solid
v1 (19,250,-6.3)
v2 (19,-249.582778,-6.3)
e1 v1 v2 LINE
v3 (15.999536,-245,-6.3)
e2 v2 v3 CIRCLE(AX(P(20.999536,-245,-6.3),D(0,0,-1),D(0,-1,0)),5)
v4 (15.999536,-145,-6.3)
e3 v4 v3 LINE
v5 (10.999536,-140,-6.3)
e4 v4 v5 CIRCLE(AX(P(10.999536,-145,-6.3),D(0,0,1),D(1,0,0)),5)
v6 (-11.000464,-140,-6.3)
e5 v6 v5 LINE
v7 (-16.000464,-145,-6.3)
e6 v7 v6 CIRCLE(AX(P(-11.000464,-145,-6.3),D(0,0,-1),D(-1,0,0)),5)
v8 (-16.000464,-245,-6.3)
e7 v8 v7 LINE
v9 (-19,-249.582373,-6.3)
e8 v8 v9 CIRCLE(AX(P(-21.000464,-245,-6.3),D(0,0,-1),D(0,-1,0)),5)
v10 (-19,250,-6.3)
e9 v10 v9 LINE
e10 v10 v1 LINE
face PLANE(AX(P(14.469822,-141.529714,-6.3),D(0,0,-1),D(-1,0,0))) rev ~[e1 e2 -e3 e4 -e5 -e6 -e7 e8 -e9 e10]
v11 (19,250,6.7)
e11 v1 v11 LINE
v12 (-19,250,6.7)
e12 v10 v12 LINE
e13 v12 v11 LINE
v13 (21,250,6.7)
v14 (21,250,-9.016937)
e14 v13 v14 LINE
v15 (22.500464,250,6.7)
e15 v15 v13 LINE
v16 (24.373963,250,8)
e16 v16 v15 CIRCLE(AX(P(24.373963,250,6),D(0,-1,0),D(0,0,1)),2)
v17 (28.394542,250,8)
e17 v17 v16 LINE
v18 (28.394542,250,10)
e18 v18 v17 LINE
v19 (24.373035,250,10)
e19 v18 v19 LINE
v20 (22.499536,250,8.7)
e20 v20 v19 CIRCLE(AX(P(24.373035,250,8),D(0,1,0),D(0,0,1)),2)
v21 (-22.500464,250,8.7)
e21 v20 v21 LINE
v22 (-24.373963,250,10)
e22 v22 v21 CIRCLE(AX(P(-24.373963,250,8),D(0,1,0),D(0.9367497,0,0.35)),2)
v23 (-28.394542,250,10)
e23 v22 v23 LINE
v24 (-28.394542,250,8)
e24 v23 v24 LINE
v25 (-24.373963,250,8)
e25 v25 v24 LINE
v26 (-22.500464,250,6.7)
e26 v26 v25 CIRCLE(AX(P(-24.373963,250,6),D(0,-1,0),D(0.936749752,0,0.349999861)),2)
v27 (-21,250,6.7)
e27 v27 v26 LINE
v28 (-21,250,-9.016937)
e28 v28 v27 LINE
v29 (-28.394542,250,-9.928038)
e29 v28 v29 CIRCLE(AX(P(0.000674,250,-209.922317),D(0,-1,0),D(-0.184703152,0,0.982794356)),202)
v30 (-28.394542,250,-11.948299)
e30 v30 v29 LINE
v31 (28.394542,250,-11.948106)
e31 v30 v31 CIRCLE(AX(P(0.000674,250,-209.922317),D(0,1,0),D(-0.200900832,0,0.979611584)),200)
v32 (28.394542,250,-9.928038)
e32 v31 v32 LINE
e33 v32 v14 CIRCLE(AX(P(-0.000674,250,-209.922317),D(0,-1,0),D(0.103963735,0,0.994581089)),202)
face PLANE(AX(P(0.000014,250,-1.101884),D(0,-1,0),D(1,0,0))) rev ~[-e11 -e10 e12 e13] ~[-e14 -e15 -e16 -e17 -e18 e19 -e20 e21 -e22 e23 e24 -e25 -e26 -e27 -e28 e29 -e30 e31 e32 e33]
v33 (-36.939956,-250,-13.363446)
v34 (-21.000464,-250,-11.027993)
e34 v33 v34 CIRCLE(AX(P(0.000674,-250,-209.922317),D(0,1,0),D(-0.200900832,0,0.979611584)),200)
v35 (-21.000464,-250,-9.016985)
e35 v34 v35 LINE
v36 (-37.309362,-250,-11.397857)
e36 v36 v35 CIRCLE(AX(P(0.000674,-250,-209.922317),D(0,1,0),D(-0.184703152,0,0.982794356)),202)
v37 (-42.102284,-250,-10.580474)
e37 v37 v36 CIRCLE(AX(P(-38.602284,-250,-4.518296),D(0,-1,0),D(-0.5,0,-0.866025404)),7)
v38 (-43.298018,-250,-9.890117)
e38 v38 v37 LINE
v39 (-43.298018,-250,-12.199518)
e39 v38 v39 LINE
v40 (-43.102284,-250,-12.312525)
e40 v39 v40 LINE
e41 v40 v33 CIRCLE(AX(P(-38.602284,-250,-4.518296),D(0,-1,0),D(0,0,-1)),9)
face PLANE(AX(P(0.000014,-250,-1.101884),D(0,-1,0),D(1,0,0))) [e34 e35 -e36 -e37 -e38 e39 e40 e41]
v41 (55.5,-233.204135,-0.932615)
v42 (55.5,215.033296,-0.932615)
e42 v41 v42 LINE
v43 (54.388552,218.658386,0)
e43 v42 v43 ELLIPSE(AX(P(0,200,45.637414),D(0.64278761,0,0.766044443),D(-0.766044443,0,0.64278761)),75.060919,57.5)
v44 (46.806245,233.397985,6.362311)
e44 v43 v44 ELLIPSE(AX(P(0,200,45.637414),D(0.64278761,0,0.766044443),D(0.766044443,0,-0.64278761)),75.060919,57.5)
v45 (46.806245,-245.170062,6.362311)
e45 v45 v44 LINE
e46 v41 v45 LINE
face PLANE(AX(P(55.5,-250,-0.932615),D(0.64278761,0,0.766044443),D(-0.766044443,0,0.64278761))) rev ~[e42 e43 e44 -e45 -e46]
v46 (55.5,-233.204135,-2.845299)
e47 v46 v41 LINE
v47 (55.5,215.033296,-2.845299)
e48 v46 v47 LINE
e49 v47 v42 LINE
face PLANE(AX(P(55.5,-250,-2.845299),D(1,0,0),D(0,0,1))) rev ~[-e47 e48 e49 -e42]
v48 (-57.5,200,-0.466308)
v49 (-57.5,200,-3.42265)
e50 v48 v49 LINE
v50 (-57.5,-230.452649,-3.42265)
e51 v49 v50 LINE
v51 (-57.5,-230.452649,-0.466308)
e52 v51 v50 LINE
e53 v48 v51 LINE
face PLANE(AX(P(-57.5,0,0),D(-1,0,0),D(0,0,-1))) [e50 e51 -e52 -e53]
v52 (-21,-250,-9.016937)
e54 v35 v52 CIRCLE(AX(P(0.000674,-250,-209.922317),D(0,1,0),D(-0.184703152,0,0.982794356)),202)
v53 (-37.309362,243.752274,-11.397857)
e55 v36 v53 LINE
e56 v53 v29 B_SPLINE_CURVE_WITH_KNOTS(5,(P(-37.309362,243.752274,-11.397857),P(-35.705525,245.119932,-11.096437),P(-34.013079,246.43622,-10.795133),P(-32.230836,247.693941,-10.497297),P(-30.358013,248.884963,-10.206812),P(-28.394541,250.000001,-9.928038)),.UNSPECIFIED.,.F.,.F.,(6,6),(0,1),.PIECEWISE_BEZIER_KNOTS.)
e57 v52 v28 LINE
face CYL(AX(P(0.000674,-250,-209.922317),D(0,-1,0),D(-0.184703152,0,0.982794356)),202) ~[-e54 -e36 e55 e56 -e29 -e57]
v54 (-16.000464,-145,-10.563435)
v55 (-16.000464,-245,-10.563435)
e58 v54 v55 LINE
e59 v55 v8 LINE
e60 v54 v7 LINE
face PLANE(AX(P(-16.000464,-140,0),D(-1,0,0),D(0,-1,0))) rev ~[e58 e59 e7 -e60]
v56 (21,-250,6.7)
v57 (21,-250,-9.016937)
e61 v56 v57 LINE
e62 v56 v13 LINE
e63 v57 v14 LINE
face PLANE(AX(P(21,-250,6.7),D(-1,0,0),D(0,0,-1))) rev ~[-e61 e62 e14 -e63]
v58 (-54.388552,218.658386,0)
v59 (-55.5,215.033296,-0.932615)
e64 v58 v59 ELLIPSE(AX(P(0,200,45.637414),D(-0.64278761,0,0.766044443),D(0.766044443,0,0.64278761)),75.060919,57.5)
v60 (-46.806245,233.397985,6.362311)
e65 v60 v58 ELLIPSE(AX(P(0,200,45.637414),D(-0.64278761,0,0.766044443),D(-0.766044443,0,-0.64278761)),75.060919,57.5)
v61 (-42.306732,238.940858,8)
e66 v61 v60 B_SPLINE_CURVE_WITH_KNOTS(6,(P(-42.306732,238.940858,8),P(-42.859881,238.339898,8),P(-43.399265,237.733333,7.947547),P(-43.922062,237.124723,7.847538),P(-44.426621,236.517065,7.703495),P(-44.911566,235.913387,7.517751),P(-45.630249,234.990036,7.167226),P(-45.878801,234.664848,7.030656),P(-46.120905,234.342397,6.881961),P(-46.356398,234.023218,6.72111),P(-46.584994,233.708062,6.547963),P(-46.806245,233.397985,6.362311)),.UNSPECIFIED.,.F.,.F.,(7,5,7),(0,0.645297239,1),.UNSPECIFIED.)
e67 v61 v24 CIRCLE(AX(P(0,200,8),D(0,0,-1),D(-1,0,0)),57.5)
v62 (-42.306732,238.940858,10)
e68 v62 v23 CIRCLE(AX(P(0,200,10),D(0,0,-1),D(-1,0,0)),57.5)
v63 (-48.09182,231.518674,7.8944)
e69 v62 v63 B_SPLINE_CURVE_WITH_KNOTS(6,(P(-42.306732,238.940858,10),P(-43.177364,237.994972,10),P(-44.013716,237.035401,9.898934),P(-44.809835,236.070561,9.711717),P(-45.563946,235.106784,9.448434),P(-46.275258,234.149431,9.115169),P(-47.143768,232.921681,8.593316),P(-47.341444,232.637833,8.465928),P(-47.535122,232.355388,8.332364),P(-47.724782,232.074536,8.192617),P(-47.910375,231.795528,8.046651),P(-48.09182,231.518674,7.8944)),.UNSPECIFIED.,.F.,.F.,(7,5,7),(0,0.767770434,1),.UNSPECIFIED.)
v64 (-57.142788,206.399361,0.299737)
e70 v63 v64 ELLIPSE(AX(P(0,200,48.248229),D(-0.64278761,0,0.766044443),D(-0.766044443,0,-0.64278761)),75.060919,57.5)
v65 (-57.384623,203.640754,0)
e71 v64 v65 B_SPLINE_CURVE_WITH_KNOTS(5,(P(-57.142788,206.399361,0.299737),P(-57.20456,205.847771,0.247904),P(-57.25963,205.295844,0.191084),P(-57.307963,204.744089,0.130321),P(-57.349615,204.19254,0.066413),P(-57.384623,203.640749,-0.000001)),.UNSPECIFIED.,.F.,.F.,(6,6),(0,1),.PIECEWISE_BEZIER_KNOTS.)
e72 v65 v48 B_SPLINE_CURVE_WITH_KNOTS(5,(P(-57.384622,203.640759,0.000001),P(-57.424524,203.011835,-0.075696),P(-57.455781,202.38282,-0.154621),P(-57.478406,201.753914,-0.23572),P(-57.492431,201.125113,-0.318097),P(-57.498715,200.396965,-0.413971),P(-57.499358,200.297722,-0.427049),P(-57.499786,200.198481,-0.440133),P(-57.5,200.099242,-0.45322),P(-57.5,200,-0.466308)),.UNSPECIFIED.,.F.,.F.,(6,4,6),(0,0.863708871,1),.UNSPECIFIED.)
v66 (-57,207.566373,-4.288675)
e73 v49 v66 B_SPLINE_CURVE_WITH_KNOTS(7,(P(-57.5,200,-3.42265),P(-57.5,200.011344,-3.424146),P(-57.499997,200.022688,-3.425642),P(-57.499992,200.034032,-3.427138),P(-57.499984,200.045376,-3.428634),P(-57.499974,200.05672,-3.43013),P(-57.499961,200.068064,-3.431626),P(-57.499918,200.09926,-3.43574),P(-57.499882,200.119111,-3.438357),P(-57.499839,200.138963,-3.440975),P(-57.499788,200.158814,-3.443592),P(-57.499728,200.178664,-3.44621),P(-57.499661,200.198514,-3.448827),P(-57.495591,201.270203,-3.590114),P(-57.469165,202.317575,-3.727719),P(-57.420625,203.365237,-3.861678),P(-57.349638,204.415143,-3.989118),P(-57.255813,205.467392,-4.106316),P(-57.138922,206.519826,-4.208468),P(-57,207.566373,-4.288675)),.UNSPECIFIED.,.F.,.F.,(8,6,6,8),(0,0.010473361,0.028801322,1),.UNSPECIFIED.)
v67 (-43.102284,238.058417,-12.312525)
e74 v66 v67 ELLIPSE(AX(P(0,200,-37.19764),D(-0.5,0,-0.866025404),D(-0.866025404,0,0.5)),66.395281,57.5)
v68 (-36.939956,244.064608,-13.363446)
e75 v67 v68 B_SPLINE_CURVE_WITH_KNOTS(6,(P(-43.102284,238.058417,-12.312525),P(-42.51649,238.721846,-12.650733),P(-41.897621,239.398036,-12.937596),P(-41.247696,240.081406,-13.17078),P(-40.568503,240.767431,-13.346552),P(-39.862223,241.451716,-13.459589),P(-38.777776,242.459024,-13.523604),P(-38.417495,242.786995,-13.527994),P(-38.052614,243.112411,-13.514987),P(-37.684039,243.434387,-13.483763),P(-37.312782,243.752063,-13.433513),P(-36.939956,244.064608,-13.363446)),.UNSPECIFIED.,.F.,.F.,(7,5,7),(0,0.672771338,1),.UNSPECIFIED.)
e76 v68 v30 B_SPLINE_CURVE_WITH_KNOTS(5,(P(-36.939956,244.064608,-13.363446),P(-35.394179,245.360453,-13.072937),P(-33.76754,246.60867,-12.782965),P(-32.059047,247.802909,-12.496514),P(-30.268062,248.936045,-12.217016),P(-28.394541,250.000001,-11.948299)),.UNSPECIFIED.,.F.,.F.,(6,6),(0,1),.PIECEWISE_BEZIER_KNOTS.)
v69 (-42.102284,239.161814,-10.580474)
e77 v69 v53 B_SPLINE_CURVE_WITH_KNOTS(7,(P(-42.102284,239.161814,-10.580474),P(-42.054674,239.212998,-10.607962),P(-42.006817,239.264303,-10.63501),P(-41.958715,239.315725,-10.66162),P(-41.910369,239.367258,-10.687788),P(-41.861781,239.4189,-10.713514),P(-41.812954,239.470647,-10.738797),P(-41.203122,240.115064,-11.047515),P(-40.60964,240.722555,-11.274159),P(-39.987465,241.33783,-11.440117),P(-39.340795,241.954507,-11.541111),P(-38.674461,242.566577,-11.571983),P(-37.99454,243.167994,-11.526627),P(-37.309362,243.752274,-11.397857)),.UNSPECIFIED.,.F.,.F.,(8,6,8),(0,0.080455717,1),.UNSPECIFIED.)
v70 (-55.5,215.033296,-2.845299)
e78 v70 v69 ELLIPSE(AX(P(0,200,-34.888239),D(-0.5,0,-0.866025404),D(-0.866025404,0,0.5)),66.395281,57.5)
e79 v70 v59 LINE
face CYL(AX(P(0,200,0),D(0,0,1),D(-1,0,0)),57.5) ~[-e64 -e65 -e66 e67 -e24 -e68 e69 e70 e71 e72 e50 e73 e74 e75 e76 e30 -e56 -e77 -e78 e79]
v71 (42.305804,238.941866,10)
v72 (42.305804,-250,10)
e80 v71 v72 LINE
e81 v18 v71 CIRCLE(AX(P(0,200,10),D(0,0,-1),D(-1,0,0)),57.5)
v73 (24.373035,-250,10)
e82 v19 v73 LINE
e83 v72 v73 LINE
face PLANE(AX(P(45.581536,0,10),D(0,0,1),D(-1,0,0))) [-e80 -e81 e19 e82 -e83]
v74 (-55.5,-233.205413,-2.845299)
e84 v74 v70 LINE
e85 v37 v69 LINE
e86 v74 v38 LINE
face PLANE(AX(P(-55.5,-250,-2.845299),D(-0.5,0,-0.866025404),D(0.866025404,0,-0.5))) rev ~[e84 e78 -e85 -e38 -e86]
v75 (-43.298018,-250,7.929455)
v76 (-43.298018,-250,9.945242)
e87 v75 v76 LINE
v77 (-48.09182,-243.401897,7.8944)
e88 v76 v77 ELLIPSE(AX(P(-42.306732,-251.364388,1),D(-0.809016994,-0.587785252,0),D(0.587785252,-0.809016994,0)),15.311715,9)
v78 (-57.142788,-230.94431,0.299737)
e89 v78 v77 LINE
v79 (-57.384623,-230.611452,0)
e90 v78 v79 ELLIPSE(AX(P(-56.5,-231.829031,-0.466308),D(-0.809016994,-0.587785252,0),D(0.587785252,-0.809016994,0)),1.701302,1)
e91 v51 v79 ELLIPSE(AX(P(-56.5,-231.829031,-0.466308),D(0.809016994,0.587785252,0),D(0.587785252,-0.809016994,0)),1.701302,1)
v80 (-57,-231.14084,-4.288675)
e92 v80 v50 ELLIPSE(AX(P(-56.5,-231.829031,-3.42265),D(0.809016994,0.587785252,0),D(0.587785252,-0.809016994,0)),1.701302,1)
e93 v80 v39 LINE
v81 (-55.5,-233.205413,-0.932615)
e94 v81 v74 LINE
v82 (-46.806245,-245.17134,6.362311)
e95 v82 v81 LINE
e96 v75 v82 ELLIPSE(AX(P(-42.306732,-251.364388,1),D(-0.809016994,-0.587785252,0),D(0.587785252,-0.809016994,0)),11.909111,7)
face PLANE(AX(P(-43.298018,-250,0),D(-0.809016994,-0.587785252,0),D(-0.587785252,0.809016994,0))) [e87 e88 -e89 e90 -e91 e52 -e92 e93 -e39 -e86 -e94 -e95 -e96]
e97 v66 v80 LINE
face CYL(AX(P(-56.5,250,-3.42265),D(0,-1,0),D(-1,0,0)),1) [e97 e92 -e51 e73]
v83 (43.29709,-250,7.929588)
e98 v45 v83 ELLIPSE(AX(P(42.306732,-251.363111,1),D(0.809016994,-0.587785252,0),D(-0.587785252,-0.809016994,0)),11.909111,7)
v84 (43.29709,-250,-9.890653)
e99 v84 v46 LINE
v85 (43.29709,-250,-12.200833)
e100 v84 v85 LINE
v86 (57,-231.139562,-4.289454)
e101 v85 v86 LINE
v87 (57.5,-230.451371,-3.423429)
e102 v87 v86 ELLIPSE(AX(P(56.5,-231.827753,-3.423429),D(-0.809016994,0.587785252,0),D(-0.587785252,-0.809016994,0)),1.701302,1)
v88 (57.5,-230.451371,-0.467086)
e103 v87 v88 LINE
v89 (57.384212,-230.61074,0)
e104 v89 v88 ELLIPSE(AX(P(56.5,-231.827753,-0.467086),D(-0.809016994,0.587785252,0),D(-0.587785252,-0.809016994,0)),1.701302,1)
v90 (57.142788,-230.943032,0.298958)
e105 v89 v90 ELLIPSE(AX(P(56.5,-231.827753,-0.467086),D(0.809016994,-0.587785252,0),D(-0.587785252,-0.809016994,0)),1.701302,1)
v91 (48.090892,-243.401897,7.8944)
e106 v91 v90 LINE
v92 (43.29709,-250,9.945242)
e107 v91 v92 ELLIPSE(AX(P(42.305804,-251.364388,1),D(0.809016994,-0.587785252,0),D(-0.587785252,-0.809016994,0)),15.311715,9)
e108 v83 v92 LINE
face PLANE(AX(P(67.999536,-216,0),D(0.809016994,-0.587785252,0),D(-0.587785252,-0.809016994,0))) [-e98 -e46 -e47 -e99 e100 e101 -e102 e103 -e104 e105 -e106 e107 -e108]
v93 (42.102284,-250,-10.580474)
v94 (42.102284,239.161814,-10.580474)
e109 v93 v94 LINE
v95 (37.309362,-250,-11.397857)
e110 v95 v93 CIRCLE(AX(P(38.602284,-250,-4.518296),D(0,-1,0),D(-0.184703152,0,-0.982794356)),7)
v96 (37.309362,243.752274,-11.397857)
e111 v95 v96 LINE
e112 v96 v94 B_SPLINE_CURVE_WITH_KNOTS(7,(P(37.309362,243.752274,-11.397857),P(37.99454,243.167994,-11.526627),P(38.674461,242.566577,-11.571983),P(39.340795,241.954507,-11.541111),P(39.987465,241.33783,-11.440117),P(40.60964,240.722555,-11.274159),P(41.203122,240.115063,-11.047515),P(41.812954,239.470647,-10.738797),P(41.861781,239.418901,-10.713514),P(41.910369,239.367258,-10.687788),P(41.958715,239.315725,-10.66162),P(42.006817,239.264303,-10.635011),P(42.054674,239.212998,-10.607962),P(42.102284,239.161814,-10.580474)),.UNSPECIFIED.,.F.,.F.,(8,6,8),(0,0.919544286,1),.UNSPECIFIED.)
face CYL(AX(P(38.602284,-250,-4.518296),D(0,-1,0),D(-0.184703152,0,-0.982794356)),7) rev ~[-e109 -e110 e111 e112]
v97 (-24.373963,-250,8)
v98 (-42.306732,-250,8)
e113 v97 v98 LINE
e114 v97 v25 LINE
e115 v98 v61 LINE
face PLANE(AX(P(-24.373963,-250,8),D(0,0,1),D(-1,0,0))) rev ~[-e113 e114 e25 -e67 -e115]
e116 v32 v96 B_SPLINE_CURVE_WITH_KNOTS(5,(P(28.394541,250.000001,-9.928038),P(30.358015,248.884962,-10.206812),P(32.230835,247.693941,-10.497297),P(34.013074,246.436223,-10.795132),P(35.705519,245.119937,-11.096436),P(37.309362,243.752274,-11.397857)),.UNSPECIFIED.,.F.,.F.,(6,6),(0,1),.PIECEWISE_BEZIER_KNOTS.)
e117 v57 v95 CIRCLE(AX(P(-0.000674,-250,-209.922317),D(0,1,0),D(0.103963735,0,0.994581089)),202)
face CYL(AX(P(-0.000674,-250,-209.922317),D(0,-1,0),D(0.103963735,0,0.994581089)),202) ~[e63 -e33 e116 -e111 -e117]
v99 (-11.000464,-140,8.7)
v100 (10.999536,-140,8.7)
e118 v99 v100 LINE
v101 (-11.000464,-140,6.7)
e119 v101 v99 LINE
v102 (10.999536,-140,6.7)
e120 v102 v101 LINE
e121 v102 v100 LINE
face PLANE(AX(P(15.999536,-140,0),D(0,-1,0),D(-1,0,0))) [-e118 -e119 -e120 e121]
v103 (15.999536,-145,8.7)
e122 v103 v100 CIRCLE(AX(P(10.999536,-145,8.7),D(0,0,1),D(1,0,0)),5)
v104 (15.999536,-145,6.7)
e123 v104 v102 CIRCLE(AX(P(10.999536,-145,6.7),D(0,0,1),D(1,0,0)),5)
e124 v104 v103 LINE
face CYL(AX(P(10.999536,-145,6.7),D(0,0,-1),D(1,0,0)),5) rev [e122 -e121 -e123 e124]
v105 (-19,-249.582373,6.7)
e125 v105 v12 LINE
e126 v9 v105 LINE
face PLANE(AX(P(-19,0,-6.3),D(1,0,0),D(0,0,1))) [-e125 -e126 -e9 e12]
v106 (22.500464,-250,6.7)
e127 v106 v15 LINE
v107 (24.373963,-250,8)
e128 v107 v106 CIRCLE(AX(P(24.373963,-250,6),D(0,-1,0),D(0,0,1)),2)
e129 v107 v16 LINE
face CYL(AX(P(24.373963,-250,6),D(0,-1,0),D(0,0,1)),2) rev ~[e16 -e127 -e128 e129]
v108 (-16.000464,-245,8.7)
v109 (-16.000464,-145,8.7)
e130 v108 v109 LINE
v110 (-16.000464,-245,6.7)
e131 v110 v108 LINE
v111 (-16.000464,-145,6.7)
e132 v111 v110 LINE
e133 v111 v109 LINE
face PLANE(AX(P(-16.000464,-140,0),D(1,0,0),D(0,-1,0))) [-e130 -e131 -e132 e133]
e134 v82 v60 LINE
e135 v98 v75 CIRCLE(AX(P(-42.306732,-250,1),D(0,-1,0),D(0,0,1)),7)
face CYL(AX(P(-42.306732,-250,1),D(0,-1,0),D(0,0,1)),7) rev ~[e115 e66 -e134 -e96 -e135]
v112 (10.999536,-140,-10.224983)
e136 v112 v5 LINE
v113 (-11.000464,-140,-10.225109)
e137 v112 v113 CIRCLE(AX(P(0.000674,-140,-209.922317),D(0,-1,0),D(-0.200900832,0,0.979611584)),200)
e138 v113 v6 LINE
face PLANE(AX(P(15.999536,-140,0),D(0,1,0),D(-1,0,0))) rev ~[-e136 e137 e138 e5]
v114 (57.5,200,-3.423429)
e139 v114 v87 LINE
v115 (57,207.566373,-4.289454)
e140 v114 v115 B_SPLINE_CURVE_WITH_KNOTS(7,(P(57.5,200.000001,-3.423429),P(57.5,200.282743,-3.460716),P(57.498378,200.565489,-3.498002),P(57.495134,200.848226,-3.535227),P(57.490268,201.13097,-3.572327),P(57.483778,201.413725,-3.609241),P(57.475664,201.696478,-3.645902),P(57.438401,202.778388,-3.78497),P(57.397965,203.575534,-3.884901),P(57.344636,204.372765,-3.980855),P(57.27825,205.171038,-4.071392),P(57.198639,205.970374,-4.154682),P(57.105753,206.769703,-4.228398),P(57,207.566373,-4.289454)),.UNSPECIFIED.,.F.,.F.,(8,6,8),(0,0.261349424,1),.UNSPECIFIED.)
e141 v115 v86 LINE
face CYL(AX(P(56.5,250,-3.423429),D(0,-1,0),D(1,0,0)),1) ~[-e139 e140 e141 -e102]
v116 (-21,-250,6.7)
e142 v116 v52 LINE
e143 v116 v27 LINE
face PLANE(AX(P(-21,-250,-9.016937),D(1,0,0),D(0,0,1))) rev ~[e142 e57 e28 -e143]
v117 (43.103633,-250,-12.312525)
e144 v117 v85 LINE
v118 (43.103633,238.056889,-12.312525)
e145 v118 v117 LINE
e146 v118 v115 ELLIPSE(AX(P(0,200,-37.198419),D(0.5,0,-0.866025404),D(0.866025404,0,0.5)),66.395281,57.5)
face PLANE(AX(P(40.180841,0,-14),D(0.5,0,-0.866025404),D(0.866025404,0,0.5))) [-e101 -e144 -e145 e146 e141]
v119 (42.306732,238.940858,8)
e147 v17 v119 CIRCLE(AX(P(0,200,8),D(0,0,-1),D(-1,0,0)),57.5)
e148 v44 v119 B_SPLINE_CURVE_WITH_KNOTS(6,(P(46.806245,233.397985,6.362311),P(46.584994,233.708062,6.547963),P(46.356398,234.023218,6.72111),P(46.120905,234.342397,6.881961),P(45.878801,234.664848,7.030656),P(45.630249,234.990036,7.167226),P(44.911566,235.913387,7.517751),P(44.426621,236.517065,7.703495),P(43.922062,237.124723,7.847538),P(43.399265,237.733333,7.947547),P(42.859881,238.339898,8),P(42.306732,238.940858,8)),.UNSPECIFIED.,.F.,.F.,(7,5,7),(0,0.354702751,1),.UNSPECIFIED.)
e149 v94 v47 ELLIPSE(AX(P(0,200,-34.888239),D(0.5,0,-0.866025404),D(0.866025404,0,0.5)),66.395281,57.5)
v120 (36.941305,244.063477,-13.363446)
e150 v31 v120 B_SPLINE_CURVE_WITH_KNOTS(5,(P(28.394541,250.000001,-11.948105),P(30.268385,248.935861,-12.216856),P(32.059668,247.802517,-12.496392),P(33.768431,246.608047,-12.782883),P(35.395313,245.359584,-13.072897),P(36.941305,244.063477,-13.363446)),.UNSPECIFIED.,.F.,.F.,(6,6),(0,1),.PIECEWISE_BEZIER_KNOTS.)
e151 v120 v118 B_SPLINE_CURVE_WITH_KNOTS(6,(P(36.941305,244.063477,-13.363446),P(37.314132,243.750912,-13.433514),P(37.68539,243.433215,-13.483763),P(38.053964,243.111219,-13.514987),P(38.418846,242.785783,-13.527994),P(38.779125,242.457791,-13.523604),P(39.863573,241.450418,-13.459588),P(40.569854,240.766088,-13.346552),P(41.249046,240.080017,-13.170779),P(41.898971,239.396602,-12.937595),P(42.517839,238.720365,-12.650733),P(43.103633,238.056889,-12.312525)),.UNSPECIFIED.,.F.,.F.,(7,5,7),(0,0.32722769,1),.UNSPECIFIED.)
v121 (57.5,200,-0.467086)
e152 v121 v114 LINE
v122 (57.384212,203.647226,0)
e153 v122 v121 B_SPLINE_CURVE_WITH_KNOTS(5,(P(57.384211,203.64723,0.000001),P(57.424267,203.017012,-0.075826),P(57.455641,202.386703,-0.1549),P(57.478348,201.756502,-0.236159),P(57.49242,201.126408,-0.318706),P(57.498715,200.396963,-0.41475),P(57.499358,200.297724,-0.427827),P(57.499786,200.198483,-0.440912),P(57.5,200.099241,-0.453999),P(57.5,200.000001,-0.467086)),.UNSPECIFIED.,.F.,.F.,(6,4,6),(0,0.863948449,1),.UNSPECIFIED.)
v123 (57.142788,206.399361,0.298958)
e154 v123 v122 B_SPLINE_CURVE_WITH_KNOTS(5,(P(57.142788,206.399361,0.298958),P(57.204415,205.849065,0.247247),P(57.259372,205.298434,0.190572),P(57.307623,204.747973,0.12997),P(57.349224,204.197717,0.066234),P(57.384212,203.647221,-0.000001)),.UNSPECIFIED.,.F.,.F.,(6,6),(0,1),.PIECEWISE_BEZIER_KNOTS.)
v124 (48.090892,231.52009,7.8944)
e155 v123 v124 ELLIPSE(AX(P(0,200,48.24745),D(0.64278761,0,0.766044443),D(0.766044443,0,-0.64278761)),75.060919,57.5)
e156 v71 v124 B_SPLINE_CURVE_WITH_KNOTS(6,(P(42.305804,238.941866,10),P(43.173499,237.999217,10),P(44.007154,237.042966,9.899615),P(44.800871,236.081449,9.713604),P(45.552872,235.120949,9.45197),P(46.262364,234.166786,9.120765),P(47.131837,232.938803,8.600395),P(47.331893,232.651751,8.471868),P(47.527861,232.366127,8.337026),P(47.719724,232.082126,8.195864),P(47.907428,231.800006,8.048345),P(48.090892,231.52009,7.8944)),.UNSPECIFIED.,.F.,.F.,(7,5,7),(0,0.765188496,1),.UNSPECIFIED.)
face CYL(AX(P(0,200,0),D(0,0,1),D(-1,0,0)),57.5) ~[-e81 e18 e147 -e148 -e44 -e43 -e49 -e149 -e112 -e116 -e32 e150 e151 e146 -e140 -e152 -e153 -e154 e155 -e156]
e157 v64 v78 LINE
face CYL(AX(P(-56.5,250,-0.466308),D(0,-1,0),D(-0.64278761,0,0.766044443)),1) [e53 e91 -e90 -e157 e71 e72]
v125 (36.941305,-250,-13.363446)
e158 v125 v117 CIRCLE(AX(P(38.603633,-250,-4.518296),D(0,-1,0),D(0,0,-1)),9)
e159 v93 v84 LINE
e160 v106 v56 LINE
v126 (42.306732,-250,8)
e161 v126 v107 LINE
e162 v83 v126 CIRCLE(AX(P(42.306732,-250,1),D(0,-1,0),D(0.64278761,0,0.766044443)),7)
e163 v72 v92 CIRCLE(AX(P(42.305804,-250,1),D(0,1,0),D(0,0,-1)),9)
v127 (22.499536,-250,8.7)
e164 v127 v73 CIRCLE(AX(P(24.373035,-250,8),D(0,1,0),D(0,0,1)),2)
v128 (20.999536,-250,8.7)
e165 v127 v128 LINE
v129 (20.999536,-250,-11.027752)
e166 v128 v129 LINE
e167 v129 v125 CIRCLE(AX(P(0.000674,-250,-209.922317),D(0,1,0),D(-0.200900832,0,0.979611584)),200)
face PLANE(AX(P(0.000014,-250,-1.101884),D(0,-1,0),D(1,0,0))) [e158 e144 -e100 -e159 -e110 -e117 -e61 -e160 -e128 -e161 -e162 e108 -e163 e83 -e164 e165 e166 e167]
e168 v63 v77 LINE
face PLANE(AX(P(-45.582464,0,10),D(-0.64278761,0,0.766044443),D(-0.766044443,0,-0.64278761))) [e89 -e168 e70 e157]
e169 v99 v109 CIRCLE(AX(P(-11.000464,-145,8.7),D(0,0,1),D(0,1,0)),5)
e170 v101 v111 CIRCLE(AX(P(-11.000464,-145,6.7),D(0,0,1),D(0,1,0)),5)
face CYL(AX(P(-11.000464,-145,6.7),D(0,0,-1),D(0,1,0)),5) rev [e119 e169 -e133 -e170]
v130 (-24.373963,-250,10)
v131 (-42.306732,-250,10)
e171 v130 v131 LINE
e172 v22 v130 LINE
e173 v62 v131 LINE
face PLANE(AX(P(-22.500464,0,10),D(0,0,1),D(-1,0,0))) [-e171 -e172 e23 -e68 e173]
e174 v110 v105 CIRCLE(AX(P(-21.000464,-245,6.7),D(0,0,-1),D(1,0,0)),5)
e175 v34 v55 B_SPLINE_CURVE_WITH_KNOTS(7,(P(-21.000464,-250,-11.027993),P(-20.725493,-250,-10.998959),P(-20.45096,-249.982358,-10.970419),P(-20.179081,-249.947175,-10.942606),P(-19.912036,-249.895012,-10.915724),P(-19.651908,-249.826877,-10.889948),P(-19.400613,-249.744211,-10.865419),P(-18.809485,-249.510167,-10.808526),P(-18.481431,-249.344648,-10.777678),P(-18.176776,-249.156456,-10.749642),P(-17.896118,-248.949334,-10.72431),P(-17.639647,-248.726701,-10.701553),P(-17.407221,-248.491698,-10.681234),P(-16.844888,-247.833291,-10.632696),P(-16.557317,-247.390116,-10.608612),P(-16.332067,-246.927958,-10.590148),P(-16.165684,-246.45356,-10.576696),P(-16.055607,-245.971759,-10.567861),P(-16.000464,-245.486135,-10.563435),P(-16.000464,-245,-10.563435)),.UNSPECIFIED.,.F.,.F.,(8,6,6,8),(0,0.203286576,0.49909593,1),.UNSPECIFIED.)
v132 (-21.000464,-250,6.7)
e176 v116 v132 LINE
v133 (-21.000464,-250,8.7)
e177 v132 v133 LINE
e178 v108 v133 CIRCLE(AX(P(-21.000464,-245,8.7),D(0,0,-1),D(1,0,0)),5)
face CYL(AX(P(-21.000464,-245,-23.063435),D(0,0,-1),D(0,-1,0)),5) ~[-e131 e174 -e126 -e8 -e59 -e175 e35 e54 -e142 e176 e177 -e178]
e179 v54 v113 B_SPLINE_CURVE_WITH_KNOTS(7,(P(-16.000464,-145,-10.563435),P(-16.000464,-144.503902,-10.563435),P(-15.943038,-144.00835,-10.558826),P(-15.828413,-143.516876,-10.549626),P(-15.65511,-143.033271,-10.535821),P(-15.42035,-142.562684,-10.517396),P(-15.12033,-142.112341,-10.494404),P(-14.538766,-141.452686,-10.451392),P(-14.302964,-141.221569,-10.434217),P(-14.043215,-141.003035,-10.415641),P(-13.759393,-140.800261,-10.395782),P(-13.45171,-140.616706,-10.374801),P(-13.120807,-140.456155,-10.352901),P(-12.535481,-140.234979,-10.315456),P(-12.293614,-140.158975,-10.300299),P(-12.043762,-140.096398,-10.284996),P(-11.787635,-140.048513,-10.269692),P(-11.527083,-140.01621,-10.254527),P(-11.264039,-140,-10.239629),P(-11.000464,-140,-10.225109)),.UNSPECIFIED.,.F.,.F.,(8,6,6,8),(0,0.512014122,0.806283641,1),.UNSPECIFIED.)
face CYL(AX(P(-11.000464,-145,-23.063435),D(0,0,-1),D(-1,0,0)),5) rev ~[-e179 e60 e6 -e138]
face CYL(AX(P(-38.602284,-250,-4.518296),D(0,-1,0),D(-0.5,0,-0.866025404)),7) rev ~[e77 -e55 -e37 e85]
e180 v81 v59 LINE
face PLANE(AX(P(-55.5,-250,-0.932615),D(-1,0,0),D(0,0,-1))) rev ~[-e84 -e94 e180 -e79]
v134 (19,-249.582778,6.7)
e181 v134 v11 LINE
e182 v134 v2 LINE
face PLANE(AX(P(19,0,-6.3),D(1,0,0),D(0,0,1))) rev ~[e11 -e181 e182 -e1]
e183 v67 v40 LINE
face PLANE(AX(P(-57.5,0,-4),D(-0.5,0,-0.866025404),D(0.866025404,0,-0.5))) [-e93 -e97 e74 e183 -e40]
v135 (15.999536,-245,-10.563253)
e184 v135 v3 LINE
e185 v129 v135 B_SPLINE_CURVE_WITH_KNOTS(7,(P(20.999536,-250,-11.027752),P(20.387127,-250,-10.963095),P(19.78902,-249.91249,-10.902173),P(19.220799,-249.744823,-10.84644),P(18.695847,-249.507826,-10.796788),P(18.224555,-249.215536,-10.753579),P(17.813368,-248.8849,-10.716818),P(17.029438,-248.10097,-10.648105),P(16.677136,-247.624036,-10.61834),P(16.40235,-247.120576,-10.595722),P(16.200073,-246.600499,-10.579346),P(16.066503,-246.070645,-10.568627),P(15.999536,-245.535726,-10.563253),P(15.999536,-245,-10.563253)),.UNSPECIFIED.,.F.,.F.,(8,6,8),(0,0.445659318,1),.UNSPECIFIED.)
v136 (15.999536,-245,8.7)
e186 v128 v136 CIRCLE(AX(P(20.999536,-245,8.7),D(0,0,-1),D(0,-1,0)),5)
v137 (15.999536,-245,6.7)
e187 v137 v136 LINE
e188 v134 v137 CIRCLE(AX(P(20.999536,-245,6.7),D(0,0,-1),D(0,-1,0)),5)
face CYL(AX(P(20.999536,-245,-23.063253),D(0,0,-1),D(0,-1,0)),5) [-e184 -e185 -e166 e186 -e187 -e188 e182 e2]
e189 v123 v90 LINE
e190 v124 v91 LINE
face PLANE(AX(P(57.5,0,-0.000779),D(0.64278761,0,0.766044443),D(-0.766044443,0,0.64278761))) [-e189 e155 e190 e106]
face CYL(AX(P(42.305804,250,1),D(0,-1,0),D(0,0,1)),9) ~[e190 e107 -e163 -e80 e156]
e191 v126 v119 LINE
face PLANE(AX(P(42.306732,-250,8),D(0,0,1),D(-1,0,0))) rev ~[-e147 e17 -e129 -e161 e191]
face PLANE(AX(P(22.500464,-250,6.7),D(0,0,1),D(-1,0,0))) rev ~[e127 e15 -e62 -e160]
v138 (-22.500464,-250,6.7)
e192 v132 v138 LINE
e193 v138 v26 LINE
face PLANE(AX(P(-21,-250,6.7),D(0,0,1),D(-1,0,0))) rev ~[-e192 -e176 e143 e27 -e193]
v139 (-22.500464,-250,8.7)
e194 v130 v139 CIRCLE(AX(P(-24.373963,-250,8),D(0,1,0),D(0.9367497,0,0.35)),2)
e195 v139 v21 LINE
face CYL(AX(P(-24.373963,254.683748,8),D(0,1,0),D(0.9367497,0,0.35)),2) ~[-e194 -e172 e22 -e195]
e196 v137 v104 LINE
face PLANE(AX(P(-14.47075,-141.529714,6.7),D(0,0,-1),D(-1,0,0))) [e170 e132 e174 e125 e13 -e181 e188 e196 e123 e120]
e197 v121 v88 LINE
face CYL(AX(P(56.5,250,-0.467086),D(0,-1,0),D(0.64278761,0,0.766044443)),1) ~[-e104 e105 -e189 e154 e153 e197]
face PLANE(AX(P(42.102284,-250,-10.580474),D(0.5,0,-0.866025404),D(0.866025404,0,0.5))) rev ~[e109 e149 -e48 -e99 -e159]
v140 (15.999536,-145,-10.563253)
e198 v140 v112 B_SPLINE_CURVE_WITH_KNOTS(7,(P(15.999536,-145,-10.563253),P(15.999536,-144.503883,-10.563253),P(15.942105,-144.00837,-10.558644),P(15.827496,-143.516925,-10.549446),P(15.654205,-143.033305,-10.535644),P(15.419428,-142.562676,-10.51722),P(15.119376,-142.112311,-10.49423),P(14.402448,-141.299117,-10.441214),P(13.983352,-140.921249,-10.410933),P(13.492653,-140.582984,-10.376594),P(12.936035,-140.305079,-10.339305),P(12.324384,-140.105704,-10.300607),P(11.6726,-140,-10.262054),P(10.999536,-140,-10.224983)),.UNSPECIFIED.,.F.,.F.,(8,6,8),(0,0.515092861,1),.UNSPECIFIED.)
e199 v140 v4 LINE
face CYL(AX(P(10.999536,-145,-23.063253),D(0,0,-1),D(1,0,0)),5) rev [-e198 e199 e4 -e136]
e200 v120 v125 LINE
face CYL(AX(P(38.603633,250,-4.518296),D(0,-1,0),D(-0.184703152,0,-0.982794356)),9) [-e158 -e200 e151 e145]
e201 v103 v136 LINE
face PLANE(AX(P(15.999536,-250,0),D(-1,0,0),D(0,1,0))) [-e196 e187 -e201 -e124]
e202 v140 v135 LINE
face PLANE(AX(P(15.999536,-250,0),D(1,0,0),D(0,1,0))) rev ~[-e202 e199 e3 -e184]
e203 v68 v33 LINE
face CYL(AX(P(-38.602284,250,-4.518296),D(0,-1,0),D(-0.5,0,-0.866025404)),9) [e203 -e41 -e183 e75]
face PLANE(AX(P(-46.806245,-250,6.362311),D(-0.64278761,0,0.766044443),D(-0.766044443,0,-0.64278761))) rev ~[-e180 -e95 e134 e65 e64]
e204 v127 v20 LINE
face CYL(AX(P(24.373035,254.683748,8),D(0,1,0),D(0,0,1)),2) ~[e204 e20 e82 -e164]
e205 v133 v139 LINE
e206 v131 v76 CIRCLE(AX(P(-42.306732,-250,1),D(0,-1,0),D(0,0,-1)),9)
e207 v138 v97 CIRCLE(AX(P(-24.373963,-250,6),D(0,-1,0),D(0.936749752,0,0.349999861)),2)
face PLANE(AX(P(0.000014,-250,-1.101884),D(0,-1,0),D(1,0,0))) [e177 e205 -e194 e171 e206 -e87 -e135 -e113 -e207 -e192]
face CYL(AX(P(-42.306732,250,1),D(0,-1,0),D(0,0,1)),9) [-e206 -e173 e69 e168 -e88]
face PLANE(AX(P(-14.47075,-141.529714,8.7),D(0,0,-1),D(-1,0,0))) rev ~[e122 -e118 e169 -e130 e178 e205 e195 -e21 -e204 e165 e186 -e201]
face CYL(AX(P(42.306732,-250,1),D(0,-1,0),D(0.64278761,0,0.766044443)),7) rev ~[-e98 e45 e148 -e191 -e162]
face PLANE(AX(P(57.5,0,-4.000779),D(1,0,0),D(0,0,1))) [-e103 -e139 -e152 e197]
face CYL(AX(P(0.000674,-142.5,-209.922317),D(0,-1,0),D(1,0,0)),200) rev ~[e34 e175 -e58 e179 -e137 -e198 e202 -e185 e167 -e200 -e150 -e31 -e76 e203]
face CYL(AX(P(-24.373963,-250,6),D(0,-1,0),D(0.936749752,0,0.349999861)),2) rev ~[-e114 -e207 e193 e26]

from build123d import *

# Parameters (mm, degrees)
F2_DEPTH       = 250
F3_W           = 38
F3_H           = 13
F4_DEPTH       = 250
F5_R           = 9
F6_R           = 1
F7_T1_DEPTH    = 509.3674969976
F9_DEPTH       = 500.001
F12_DEPTH      = 13.5192964571
F12_DEPTH_BACK = 10.001
F13_T1_DEPTH   = 2
F13_T6_DEPTH   = 16.7634354909
F13_S7_R       = 200
F13_T8_DEPTH   = 11
F13_T12_DEPTH  = 16.7632527384
F13_S13_R      = 200
F13_T14_DEPTH  = 11
F13_T15_DEPTH  = 29.2634354909
F13_T17_DEPTH  = 27
F13_T19_DEPTH  = 29.2632527384
F14_DEPTH      = 13.5192964571
F14_DEPTH_BACK = 10.001


# Not quite as in the source:
# - a fillet or chamfer that OpenCascade refuses, or shapes differently, is made with other operations: its cross-section is extruded or revolved along the edge and cut away or added


with BuildPart() as f2:
    # F0 (on Front) → F2 (new body, symmetric)
    with BuildSketch(Plane.XZ):
        with BuildLine():
            Line((-22.5004640741, 10), (-45.5824640741, 10))
            Line((-45.5824640741, 10), (-57.5, 0))
            Line((-57.5, 0), (-57.5, -4))
            Line((-57.5, -4), (-40.1794919243, -14))
            ThreePointArc((-40.1794919243, -14), (0.0006744682, -9.9223168214), (40.1808408606, -14))
            Line((40.1808408606, -14), (57.5, -4.0007788087))
            Line((57.5, -4.0007788087), (57.5, -0.0007788087))
            Line((57.5, -0.0007788087), (45.5815359259, 10))
            Line((45.5815359259, 10), (22.4995359259, 10))
            Line((22.4995359259, 10), (22.4995359259, 8.7))
            Line((22.4995359259, 8.7), (-22.5004640741, 8.7))
            Line((-22.5004640741, 8.7), (-22.5004640741, 10))
        make_face()
    extrude(amount=F2_DEPTH, both=True)

    # F3 (on Front) → F4 (cut, symmetric)
    with BuildSketch(Plane.XZ):
        with Locations((0, 0.2)):
            Rectangle(F3_W, F3_H)
    extrude(amount=F4_DEPTH, both=True, mode=Mode.SUBTRACT)

    # F5
    f5_edges = [f2.edges().sort_by_distance(p)[0] for p in [
        (45.581536, 0, 10),
        (40.180841, 0, -14),
        (-45.582464, 0, 10),
        (-40.179492, 0, -14),
    ]]
    fillet(f5_edges, radius=F5_R)

    # F6
    f6_edges = [f2.edges().sort_by_distance(p)[0] for p in [
        (57.5, 0, -0.000779),
        (57.5, 0, -4.000779),
        (-57.5, 0, 0),
        (-57.5, 0, -4),
    ]]
    fillet(f6_edges, radius=F6_R)

    # F7: fillet of radius 2 on 2 edges, made by hand

    # F7_s2 → F7_t1 (cut)
    with BuildSketch(Plane.XZ.offset(-254.6837484988)):
        with BuildLine():
            ThreePointArc((24.3730353255, 10), (23.2328599004, 9.6431676725), (22.4995359259, 8.7))
            Line((22.4995359259, 8.7), (22.4995359259, 10))
            Line((22.4995359259, 10), (24.3730353255, 10))
        make_face()
        with BuildLine():
            ThreePointArc((-22.5004640741, 8.7), (-23.2337880485, 9.6431676725), (-24.3739634736, 10))
            Line((-24.3739634736, 10), (-22.5004640741, 10))
            Line((-22.5004640741, 10), (-22.5004640741, 8.7))
        make_face()
    extrude(amount=F7_T1_DEPTH, mode=Mode.SUBTRACT)

    # F8 (on face) → F9 (cut, through all)
    with BuildSketch(Plane.XZ.offset(250)):
        with BuildLine():
            Line((-21, -9.0169369236), (-21, 6.6999997944))
            Line((-21, 6.6999997944), (-22.5004640741, 6.6999997944))
            ThreePointArc((-22.5004640741, 6.6999997944), (-23.2337879899, 7.6431676078), (-24.3739634736, 8))
            Line((-24.3739634736, 8), (-42.3067319657, 8))
            ThreePointArc((-42.3067319657, 8), (-44.7008729689, 7.5778483455), (-46.8062452335, 6.3623111018))
            Line((-46.8062452335, 6.3623111018), (-55.5, -0.9326153163))
            Line((-55.5, -0.9326153163), (-55.5, -2.8452994616))
            Line((-55.5, -2.8452994616), (-42.102284203, -10.5804742836))
            ThreePointArc((-42.102284203, -10.5804742836), (-39.7790708711, -11.4186713119), (-37.3093621422, -11.3978569477))
            ThreePointArc((-37.3093621422, -11.3978569477), (-29.178975147, -10.0409819041), (-21, -9.0169369236))
        make_face()
        with BuildLine():
            Line((22.5004640741, 6.6999997944), (21, 6.6999997944))
            Line((21, 6.6999997944), (21, -9.0169369236))
            ThreePointArc((21, -9.0169369236), (29.178975147, -10.0409819041), (37.3093621422, -11.3978569477))
            ThreePointArc((37.3093621422, -11.3978569477), (39.7790708711, -11.4186713119), (42.102284203, -10.5804742836))
            Line((42.102284203, -10.5804742836), (55.5, -2.8452994616))
            Line((55.5, -2.8452994616), (55.5, -0.9326153163))
            Line((55.5, -0.9326153163), (46.8062452335, 6.3623111018))
            ThreePointArc((46.8062452335, 6.3623111018), (44.7008729689, 7.5778483455), (42.3067319657, 8))
            Line((42.3067319657, 8), (24.3739634736, 8))
            ThreePointArc((24.3739634736, 8), (23.2337879899, 7.6431676078), (22.5004640741, 6.6999997944))
        make_face()
    extrude(amount=-F9_DEPTH, mode=Mode.SUBTRACT)

    # F11 (on Top) → F12 (cut, two sides)
    with BuildSketch(Plane.XY) as f12_sk:
        Polygon((-68.0004640741, -346), (67.9995359259, -346), (67.9995359259, -216), (43.2970899738, -250), (15.9995359259, -250), (15.9995359259, -140), (-16.0004640741, -140), (-16.0004640741, -250), (-43.2980181219, -250), (-68.0004640741, -216), align=None)
    extrude(amount=-F12_DEPTH, mode=Mode.SUBTRACT)
    extrude(f12_sk.sketch, amount=F12_DEPTH_BACK, mode=Mode.SUBTRACT)

    # F13: fillet of radius 5 on 8 edges, made by hand

    # F13_s2 → F13_t1 (join)
    with BuildSketch(Plane.XY.offset(6.7)):
        with BuildLine():
            ThreePointArc((-11.0004640741, -140), (-14.53599798, -141.4644660941), (-16.0004640741, -145))
            Line((-16.0004640741, -145), (-16.0004640741, -140))
            Line((-16.0004640741, -140), (-11.0004640741, -140))
        make_face()
        with BuildLine():
            ThreePointArc((15.9995359259, -145), (14.5350698319, -141.4644660941), (10.9995359259, -140))
            Line((10.9995359259, -140), (15.9995359259, -140))
            Line((15.9995359259, -140), (15.9995359259, -145))
        make_face()
    extrude(amount=F13_T1_DEPTH)


with BuildPart() as f13_tool4:
    # F13_s5 → F13_t6 (new body)
    with BuildSketch(Plane.XY.offset(-23.0634354909)):
        with BuildLine():
            ThreePointArc((-16.0004640741, -145), (-14.53599798, -141.4644660941), (-11.0004640741, -140))
            Line((-11.0004640741, -140), (-16.0004640741, -140))
            Line((-16.0004640741, -140), (-16.0004640741, -145))
        make_face()
    extrude(amount=F13_T6_DEPTH)

    # F13_s7 → F13_t8 (cut, symmetric)
    with BuildSketch(Plane.XZ.offset(142.5)):
        with Locations((0.0006744682, -209.9223168214)):
            Circle(F13_S7_R)
    extrude(amount=F13_T8_DEPTH, both=True, mode=Mode.SUBTRACT)


with BuildPart() as f2_1:
    add(f2.part)

    # F13_t3: union F13_tool4
    add(f13_tool4.part)


with BuildPart() as f13_tool10:
    # F13_s11 → F13_t12 (new body)
    with BuildSketch(Plane.XY.offset(-23.0632527384)):
        with BuildLine():
            ThreePointArc((15.9995359259, -145), (14.5350698319, -141.4644660941), (10.9995359259, -140))
            Line((10.9995359259, -140), (15.9995359259, -140))
            Line((15.9995359259, -140), (15.9995359259, -145))
        make_face()
    extrude(amount=F13_T12_DEPTH)

    # F13_s13 → F13_t14 (cut, symmetric)
    with BuildSketch(Plane.XZ.offset(142.5)):
        with Locations((0.0006744682, -209.9223168214)):
            Circle(F13_S13_R)
    extrude(amount=F13_T14_DEPTH, both=True, mode=Mode.SUBTRACT)


with BuildPart() as f2_2:
    add(f2_1.part)

    # F13_t9: union F13_tool10
    add(f13_tool10.part)

    # F13_s16 → F13_t15 (cut)
    with BuildSketch(Plane.XY.offset(-23.0634354909)):
        with BuildLine():
            ThreePointArc((-21.0004640741, -250), (-17.4649301681, -248.5355339059), (-16.0004640741, -245))
            Line((-16.0004640741, -245), (-16.0004640741, -250))
            Line((-16.0004640741, -250), (-21.0004640741, -250))
        make_face()
    extrude(amount=F13_T15_DEPTH, mode=Mode.SUBTRACT)

    # F13_s18 → F13_t17 (cut)
    with BuildSketch(Plane.XY.offset(-5.8)):
        with BuildLine():
            ThreePointArc((20.9995359259, -250), (17.46400202, -248.5355339059), (15.9995359259, -245))
            Line((15.9995359259, -245), (15.9995359259, -250))
            Line((15.9995359259, -250), (20.9995359259, -250))
        make_face()
        with BuildLine():
            ThreePointArc((-16.0004640741, -245), (-17.4649301681, -248.5355339059), (-21.0004640741, -250))
            Line((-21.0004640741, -250), (-16.0004640741, -250))
            Line((-16.0004640741, -250), (-16.0004640741, -245))
        make_face()
    extrude(amount=F13_T17_DEPTH, mode=Mode.SUBTRACT)

    # F13_s20 → F13_t19 (cut)
    with BuildSketch(Plane.XY.offset(-23.0632527384)):
        with BuildLine():
            ThreePointArc((20.9995359259, -250), (17.46400202, -248.5355339059), (15.9995359259, -245))
            Line((15.9995359259, -245), (15.9995359259, -250))
            Line((15.9995359259, -250), (20.9995359259, -250))
        make_face()
    extrude(amount=F13_T19_DEPTH, mode=Mode.SUBTRACT)

    # F10 (on Top) → F14 (cut, two sides)
    with BuildSketch(Plane.XY) as f14_sk:
        with BuildLine():
            ThreePointArc((-57.5, 200), (0, 257.5), (57.5, 200))
            Line((57.5, 200), (57.5, 280))
            Line((57.5, 280), (-57.5, 280))
            Line((-57.5, 280), (-57.5, 200))
        make_face()
    extrude(amount=-F14_DEPTH, mode=Mode.SUBTRACT)
    extrude(f14_sk.sketch, amount=F14_DEPTH_BACK, mode=Mode.SUBTRACT)


solid = f2_2.part
